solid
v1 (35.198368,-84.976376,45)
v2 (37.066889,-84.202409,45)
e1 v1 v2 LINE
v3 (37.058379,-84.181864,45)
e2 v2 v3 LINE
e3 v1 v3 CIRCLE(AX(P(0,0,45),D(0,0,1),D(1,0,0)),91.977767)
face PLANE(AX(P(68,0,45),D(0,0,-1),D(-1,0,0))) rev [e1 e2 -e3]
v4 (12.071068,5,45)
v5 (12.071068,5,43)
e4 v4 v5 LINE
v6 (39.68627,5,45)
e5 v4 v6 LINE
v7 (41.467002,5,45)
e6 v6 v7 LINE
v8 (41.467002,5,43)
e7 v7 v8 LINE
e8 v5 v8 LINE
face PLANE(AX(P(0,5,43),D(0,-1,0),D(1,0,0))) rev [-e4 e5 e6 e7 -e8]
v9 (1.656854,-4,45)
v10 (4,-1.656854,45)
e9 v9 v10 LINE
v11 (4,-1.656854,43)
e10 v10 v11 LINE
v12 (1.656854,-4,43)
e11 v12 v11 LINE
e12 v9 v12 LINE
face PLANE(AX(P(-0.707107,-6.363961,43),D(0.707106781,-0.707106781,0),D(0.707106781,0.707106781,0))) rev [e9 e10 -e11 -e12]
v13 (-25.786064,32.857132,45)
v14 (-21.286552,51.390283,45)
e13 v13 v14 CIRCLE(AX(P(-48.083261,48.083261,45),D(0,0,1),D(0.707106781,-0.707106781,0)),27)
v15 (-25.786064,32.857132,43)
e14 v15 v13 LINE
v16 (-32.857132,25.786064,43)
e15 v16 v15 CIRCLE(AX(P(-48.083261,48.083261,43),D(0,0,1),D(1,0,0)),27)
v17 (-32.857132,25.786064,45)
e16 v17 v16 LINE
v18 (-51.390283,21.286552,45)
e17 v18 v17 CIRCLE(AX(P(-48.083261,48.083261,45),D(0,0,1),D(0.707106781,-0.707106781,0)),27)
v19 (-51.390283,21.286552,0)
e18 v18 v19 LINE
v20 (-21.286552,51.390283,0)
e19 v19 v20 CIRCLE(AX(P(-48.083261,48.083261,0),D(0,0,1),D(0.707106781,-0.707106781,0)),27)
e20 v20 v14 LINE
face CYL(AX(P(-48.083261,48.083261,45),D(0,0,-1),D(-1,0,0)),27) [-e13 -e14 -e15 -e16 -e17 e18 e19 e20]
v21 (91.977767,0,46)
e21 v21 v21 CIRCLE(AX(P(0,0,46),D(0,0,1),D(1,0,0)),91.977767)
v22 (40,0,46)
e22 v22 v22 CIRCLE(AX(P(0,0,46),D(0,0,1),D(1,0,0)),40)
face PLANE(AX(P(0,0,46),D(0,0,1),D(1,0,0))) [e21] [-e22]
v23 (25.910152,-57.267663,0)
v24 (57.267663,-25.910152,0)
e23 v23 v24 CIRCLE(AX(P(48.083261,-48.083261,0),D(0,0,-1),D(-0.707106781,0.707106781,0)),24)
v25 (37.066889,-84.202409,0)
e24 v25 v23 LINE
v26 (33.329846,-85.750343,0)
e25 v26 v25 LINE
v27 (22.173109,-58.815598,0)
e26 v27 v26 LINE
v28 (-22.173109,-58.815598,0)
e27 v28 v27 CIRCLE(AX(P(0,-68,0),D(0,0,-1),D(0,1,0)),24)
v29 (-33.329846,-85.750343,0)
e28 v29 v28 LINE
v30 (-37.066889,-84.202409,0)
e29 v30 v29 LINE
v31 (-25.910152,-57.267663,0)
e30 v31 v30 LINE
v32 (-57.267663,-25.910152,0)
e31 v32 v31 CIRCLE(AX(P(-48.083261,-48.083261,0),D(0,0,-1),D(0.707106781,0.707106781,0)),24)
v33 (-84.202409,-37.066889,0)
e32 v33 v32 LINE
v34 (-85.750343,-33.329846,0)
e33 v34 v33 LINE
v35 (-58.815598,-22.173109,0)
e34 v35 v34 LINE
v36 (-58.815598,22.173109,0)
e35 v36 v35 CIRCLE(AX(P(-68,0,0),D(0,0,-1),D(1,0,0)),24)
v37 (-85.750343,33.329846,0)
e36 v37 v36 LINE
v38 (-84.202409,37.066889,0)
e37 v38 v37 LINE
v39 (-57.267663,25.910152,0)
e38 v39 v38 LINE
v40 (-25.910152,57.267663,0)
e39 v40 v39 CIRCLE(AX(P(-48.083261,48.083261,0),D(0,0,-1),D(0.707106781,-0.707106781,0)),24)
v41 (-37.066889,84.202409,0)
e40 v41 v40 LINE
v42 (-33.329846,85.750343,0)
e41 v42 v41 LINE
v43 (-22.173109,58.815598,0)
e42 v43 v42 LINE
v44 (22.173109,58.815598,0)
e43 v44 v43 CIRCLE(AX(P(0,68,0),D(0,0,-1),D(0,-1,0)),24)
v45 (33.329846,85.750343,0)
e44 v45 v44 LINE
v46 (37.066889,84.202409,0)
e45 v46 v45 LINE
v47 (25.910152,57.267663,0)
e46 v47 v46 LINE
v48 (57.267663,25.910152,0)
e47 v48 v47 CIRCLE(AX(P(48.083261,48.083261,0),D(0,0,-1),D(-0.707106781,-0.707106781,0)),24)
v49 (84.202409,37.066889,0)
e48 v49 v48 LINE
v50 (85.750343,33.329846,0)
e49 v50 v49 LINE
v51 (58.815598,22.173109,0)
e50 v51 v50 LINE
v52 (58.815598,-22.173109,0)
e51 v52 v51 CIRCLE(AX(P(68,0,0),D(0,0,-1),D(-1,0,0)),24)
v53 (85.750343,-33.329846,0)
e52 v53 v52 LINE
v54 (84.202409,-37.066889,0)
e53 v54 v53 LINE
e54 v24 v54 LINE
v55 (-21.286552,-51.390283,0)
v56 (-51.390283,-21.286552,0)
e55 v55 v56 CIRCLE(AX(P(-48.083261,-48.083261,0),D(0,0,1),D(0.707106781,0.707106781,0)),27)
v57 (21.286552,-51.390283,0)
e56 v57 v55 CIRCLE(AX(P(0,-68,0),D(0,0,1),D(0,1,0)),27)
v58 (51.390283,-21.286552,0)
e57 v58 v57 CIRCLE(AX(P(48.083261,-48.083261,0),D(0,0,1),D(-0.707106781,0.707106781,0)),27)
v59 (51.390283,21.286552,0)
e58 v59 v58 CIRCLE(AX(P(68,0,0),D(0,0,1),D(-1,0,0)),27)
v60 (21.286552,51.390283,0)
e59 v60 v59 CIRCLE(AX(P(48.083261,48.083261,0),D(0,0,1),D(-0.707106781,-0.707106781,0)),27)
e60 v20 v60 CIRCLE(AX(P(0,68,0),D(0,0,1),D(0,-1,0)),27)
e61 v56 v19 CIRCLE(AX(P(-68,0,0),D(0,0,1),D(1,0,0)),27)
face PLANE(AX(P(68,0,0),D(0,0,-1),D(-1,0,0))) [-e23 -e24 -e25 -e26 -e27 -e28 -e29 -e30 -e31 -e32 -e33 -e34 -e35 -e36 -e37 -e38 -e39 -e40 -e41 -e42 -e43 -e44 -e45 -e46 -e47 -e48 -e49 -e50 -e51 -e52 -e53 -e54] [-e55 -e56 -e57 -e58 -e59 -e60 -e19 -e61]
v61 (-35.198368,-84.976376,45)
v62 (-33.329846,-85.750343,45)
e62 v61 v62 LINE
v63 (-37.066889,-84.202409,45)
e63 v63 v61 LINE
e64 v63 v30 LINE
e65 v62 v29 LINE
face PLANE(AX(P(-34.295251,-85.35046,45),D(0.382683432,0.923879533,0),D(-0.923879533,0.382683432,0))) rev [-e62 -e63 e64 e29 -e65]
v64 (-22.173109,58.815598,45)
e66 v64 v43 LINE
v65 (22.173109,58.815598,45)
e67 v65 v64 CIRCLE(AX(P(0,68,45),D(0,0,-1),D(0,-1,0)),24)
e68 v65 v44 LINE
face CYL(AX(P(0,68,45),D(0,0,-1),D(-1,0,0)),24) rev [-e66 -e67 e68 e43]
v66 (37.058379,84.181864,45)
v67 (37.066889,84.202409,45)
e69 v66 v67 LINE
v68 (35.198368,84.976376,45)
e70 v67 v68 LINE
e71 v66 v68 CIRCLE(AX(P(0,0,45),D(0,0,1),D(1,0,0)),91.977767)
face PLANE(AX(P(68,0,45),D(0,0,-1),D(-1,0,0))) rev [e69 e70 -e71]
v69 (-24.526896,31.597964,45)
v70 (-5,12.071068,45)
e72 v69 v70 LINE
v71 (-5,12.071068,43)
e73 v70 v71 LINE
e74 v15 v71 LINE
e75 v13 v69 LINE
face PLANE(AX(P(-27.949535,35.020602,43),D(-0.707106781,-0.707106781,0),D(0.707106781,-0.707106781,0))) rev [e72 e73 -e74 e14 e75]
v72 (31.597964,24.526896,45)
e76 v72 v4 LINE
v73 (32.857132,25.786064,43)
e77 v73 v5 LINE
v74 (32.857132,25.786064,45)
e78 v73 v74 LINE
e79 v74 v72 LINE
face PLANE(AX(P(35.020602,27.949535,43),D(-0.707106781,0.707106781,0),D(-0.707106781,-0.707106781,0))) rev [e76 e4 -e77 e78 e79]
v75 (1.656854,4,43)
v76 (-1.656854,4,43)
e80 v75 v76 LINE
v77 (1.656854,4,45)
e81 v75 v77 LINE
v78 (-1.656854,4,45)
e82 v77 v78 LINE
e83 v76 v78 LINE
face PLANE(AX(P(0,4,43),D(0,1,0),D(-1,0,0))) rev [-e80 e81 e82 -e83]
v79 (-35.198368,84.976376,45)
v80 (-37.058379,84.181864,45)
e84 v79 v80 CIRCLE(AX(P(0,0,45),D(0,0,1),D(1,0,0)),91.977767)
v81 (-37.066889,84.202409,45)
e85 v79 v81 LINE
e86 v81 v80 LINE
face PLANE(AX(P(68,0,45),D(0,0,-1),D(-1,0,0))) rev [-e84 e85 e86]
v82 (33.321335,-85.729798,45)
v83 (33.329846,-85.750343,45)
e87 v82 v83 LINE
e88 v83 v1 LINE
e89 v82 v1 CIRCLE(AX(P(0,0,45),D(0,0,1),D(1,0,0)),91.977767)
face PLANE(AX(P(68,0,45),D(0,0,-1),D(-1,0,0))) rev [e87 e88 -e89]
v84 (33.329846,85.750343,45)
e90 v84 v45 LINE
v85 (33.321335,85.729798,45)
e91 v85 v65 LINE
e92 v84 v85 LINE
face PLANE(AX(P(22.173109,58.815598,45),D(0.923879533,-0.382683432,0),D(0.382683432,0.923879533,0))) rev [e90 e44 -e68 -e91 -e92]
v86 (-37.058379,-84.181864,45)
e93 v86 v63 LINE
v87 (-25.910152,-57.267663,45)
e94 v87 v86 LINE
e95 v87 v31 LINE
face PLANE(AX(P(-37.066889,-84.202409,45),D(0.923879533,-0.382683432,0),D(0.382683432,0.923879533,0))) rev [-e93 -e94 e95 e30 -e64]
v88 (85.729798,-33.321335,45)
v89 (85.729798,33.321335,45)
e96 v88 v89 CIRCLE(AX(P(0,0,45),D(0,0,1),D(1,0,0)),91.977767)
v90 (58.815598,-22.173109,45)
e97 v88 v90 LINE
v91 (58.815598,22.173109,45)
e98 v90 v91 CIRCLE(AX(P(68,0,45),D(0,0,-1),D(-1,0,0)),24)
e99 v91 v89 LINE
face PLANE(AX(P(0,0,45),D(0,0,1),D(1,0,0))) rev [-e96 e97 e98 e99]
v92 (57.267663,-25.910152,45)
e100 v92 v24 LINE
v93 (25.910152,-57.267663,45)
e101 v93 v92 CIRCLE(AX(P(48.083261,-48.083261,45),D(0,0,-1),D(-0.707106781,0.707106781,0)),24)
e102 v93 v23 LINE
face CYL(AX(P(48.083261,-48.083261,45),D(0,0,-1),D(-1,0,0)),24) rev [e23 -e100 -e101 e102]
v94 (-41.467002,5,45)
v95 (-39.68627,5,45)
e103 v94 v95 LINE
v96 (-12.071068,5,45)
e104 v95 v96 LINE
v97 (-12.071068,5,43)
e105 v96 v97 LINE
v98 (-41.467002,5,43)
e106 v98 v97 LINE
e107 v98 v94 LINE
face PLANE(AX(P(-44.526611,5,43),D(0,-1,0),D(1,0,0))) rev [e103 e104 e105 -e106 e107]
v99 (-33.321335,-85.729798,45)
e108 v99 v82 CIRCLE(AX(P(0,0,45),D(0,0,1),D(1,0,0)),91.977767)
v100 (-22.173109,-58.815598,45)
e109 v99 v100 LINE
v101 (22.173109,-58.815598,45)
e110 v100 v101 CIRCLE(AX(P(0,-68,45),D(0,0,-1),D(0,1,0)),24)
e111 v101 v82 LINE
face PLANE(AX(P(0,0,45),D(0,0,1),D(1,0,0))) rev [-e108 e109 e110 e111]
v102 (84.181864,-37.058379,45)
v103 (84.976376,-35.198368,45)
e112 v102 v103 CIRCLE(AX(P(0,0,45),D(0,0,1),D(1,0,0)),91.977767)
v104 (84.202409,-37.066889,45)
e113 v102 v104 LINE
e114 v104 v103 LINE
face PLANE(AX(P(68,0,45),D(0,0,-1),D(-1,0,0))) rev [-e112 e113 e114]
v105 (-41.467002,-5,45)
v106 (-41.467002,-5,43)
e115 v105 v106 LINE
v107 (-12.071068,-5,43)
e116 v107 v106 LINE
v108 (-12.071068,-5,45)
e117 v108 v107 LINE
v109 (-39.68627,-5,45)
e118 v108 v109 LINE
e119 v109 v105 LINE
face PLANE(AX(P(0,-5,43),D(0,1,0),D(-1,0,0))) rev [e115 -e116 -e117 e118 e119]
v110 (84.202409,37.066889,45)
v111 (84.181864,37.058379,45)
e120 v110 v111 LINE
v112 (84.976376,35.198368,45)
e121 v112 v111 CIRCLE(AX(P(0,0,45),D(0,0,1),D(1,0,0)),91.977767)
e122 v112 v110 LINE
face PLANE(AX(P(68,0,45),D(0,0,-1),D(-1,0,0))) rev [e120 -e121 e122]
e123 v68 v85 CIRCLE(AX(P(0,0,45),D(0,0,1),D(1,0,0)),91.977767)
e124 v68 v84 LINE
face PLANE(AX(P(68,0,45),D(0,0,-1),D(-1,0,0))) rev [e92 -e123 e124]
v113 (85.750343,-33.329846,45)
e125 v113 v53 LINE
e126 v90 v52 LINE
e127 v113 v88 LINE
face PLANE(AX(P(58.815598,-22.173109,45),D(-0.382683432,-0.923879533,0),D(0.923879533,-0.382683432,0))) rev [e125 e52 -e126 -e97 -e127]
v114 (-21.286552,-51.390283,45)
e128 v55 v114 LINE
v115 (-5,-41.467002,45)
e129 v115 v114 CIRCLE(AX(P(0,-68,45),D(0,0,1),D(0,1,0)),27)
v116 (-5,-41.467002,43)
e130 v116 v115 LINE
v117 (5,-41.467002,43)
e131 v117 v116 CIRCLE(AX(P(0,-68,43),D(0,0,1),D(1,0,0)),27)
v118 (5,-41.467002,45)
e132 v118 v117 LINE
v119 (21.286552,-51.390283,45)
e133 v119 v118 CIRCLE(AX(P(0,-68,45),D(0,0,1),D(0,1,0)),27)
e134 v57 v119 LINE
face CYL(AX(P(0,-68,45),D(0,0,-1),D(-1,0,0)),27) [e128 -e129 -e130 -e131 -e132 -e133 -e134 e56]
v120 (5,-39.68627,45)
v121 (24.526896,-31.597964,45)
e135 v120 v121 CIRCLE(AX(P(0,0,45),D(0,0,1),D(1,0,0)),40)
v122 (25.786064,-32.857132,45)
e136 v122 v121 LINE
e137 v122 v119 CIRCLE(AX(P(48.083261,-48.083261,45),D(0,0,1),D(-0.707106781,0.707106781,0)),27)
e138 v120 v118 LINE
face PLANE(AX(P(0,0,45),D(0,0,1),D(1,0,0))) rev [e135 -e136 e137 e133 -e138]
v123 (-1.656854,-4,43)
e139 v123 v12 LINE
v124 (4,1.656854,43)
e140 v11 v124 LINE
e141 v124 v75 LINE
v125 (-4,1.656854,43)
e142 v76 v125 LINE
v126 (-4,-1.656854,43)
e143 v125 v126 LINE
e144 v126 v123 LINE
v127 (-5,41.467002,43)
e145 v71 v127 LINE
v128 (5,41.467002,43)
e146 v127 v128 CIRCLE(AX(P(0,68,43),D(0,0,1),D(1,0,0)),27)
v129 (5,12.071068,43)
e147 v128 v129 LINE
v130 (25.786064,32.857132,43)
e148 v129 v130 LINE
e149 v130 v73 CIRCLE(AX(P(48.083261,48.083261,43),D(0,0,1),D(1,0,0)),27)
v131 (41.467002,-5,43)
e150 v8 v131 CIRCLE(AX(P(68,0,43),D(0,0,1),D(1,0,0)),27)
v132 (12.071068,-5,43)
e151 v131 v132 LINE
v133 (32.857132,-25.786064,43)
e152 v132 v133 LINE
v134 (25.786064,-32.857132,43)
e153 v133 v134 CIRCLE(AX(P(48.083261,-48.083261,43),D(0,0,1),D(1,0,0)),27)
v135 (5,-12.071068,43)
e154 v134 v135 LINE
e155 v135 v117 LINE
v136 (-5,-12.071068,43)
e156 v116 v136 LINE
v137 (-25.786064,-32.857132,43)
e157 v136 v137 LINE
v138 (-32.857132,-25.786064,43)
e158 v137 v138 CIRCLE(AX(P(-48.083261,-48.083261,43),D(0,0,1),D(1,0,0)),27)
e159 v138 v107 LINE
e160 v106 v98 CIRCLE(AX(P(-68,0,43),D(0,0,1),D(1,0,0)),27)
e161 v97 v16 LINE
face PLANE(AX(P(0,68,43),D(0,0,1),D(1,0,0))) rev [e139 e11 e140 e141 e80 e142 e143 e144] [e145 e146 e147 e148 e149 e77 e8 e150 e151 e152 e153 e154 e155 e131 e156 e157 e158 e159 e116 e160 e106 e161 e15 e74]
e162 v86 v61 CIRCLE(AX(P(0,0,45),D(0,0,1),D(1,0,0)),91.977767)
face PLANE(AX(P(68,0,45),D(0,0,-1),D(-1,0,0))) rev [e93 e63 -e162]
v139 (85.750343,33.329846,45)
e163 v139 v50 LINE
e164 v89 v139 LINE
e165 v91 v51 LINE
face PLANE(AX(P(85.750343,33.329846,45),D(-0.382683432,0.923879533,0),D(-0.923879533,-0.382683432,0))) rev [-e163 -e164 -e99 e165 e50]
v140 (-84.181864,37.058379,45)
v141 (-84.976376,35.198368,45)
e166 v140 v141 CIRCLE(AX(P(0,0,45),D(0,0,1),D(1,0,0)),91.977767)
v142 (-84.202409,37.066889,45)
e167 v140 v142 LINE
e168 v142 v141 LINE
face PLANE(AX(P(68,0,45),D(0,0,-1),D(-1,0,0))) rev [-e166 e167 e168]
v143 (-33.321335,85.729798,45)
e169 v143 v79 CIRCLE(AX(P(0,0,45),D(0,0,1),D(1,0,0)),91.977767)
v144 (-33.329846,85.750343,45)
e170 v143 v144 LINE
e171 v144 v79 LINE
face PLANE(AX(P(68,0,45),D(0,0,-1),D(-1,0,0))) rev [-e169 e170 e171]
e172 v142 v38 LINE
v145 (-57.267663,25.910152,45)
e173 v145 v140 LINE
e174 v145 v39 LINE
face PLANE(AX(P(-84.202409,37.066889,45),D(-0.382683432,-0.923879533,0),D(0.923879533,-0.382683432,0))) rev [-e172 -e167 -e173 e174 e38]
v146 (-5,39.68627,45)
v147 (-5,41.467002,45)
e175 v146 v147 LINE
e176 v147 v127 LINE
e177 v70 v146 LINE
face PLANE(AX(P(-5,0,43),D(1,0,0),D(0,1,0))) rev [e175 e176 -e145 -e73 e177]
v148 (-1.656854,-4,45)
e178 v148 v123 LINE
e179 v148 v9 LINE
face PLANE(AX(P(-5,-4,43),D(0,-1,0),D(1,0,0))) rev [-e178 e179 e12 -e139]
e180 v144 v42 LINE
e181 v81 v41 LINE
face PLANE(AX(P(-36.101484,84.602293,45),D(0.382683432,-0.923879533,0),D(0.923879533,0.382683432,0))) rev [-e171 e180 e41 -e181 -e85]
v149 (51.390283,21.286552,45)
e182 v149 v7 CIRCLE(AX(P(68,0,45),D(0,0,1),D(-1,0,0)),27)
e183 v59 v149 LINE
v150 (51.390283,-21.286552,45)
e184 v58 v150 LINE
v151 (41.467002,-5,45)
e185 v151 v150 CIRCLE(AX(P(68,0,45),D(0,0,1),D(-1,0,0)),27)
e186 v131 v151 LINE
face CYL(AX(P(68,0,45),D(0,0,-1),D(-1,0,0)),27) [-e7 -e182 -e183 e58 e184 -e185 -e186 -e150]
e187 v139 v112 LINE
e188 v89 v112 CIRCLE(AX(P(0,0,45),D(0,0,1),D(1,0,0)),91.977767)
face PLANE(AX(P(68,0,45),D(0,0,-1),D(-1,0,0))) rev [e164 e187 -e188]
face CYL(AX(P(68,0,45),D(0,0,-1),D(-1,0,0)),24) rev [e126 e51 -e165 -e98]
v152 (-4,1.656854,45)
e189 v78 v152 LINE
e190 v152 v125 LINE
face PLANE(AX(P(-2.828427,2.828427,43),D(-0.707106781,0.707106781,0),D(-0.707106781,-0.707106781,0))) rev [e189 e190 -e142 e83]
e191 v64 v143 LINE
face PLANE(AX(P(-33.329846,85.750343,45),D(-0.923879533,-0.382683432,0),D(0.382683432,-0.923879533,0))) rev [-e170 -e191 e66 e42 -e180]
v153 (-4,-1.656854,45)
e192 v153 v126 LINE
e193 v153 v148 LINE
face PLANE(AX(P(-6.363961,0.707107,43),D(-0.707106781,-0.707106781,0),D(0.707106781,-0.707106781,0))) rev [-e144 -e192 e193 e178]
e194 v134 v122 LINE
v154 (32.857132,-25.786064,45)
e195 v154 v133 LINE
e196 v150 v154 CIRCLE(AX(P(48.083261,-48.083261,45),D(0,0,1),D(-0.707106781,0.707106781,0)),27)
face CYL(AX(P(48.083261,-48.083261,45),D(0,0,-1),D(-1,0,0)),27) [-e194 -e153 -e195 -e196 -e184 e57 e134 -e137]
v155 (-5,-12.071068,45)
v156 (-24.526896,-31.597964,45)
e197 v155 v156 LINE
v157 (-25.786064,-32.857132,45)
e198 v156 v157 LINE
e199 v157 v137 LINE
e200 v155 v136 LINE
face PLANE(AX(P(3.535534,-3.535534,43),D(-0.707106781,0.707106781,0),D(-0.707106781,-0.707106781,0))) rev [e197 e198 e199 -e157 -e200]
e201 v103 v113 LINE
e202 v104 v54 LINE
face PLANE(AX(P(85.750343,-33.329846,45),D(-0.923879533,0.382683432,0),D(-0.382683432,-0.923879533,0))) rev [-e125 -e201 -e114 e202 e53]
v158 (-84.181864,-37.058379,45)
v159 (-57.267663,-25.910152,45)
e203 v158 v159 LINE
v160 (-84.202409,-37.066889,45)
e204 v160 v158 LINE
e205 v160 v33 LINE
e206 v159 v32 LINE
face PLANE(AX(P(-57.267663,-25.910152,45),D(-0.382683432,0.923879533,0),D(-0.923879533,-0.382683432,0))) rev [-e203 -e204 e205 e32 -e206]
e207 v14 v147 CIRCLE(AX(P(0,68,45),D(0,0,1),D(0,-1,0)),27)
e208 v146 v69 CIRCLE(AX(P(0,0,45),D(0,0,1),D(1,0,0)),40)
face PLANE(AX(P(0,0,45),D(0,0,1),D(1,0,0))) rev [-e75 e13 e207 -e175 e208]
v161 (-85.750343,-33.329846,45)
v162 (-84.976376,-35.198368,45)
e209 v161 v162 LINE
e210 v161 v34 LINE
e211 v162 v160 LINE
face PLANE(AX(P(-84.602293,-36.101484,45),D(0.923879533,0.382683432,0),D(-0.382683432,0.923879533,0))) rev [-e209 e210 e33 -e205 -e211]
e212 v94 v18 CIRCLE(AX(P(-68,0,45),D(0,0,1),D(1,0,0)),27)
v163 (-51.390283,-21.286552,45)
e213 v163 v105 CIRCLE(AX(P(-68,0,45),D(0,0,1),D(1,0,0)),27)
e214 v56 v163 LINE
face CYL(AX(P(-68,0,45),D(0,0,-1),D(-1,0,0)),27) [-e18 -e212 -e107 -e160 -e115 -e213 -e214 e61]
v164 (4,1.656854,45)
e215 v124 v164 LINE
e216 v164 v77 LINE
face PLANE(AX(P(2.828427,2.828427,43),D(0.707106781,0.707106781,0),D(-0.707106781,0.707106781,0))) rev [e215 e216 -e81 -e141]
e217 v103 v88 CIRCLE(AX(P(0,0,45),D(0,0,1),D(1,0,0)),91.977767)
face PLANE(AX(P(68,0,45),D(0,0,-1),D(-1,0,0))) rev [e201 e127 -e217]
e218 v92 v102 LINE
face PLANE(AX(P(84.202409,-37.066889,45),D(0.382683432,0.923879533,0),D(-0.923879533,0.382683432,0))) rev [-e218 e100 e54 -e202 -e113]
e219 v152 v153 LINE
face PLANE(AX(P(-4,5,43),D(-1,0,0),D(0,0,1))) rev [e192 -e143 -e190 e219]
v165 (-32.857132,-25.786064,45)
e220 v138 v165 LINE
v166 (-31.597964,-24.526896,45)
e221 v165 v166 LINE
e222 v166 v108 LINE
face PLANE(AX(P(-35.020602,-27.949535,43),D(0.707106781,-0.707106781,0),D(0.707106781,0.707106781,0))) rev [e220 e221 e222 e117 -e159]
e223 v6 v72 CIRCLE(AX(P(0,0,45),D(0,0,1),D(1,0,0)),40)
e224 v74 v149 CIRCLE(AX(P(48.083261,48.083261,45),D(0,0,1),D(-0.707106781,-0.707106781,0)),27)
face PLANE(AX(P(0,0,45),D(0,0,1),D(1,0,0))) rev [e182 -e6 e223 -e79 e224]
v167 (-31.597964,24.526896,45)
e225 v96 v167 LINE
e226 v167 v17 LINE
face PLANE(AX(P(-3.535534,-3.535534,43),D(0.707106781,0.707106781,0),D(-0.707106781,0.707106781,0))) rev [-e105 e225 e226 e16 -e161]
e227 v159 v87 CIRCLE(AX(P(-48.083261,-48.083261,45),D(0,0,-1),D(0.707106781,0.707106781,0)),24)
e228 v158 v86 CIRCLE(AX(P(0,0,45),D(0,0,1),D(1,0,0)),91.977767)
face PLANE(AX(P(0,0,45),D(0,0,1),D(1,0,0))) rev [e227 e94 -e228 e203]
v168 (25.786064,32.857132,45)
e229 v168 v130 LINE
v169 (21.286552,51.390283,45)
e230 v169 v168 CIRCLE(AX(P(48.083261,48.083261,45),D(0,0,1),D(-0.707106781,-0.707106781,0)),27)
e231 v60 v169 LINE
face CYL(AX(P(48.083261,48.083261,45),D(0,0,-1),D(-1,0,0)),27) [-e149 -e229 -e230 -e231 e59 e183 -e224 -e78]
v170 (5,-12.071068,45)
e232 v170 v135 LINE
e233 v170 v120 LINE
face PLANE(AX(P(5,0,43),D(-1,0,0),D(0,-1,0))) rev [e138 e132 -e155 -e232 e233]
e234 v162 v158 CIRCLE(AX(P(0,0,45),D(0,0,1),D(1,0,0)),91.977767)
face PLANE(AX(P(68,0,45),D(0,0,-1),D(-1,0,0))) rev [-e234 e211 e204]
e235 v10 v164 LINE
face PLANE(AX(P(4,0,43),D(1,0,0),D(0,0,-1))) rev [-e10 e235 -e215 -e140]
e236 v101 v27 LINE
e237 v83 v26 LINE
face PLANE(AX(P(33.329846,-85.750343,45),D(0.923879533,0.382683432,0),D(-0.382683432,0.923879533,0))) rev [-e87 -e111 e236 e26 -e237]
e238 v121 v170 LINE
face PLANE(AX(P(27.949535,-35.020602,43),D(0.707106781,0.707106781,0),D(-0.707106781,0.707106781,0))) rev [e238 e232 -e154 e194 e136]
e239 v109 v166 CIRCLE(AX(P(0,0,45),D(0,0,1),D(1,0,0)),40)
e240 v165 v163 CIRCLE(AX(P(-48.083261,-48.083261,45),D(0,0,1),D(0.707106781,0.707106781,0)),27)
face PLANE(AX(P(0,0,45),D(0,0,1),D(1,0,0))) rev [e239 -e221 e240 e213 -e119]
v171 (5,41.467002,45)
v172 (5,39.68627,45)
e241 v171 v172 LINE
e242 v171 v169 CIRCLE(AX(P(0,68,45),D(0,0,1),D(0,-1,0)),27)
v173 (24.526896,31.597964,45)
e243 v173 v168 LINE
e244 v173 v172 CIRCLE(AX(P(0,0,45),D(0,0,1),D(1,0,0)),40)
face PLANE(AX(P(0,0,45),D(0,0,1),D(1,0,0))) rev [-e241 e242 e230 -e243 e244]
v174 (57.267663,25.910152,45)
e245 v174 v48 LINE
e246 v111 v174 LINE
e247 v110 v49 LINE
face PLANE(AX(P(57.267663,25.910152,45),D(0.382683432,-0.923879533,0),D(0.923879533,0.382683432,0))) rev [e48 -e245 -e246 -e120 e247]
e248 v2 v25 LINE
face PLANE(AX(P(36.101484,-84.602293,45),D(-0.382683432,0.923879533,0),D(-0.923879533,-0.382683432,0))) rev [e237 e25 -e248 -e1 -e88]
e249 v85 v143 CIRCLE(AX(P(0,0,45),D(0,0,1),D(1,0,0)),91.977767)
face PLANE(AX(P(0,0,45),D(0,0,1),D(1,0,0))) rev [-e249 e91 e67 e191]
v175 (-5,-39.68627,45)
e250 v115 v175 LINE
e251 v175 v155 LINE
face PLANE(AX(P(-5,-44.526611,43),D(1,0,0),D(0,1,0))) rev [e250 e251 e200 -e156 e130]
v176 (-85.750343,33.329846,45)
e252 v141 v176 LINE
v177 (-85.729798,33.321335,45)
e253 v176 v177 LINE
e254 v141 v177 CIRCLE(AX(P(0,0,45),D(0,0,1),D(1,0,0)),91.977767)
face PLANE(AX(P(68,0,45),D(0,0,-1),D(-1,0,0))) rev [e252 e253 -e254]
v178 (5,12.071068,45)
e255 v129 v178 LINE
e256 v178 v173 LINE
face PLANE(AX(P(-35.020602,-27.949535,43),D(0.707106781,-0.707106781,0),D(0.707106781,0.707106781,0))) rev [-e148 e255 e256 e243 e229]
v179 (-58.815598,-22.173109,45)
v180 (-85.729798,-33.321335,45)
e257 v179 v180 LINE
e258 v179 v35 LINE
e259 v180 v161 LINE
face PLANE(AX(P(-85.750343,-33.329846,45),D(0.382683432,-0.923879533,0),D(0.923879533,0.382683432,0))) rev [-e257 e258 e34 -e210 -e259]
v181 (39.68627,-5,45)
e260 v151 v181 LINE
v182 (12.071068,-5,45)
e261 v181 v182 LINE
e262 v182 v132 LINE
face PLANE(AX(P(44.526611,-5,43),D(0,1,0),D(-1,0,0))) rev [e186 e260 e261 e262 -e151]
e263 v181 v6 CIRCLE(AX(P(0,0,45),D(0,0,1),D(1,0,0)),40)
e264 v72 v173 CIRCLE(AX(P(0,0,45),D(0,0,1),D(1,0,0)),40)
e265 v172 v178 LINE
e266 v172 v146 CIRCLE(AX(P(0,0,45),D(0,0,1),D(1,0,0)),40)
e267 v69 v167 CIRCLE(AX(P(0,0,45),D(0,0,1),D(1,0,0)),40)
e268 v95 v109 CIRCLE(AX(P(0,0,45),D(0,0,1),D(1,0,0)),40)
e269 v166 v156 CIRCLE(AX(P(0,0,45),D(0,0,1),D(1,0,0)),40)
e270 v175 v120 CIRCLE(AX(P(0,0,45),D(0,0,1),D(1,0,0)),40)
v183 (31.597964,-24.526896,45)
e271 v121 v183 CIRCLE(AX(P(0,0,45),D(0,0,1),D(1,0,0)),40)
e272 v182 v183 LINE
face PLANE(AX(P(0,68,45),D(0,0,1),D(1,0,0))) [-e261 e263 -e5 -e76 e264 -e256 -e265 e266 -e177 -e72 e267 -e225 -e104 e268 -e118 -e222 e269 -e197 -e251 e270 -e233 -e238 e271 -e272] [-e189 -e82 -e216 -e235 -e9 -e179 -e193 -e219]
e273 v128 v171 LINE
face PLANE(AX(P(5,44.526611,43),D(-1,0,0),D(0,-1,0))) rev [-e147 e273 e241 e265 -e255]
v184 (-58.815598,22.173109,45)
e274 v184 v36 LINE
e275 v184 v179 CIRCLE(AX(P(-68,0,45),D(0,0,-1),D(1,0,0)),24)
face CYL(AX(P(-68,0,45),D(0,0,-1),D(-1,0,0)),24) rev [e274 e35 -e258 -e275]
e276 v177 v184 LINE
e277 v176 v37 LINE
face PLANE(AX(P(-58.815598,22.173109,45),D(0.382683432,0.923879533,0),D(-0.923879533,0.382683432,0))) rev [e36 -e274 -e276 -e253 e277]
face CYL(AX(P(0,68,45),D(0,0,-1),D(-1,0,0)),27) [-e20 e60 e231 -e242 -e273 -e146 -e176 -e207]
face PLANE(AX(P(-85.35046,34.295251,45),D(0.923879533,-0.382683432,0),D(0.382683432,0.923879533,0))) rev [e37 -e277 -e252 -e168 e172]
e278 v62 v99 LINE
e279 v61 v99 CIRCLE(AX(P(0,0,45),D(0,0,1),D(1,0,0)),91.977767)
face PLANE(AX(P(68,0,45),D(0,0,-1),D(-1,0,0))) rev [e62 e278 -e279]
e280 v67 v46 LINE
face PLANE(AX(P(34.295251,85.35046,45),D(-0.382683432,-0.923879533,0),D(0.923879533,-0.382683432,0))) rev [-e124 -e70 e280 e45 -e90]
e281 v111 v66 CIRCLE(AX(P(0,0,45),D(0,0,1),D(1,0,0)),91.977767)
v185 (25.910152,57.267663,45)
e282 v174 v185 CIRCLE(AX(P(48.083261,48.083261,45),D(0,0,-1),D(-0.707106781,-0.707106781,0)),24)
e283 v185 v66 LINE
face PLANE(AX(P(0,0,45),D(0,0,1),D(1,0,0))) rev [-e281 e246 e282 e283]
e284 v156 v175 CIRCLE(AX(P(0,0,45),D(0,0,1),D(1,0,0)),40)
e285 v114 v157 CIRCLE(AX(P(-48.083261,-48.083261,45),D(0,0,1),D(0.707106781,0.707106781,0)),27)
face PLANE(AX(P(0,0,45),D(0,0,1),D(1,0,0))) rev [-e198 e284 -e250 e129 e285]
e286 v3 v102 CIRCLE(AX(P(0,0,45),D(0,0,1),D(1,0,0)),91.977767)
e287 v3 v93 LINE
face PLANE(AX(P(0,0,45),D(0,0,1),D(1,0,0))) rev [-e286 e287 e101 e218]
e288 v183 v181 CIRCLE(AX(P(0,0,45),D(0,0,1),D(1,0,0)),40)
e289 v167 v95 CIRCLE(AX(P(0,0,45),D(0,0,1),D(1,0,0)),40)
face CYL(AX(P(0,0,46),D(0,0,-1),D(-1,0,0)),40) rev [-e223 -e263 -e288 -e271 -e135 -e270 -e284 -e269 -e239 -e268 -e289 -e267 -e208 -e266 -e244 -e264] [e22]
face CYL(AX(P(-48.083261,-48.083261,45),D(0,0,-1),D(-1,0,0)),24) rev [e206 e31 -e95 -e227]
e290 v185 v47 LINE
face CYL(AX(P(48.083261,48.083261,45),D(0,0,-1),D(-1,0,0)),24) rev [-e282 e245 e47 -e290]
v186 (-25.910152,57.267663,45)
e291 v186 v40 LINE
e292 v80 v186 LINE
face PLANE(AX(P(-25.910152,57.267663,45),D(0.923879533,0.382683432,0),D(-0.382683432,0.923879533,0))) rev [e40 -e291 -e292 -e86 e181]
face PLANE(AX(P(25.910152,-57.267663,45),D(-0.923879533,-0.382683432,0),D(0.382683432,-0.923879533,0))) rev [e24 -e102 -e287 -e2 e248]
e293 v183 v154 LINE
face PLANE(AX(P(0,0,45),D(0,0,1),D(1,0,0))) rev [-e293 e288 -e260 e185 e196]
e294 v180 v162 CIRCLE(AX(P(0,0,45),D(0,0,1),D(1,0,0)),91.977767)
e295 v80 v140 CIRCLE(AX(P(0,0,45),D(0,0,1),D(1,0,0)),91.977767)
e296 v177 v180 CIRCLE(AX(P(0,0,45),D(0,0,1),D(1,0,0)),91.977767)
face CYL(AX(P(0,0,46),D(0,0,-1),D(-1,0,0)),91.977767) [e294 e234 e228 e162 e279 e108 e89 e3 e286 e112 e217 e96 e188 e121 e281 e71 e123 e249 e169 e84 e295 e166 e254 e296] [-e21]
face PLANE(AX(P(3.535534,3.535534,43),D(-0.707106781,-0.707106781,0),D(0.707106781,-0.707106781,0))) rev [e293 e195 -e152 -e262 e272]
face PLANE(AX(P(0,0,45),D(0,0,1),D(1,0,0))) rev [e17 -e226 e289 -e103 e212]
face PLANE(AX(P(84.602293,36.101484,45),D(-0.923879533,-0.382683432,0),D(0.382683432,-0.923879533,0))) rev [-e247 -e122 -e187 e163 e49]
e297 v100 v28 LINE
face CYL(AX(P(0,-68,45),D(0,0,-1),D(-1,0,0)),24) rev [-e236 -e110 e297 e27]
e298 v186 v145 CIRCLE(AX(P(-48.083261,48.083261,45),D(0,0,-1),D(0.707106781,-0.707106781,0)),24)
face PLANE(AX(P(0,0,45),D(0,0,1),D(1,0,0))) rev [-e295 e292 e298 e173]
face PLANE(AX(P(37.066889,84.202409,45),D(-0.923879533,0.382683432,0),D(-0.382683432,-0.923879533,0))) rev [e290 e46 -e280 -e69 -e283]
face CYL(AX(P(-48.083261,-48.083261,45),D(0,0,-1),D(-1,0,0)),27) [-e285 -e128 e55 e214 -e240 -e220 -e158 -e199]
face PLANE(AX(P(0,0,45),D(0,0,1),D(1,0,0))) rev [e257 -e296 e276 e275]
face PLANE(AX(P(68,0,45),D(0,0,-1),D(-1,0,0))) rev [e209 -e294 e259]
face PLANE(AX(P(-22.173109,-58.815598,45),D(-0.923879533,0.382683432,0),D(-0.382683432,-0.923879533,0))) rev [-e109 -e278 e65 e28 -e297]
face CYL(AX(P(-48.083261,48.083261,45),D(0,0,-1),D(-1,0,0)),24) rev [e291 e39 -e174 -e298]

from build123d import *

# Parameters (mm, degrees)
MAIN_EXTRUSION_DEPTH         = 45
R_P_TITION_CIRCULAIRE1_DEPTH = 45
ESQUISSE2_R                  = 91.977766886
ESQUISSE2_R_2                = 40
GLOBAL_CIRCLE_DEPTH          = 1
CENTRAL_START                = 2
CENTRAL_FIXING_DEPTH         = 2
R_P_TITION_CIRCULAIRE2_COUNT = 8


# Read off the part's stored shape, not the designer's step: Répétition circulaire1
with BuildPart() as part:
    # Esquisse1 → Main Extrusion (new body)
    with BuildSketch(Plane.XY):
        with BuildLine():
            Line((57.667547326, 24.944747378), (84.602293038, 36.101484351))
            Line((84.602293038, 36.101484351), (85.750343335, 33.329845753))
            Line((85.750343335, 33.329845753), (58.815597623, 22.17310878))
            ThreePointArc((58.815597623, 22.17310878), (44, 0), (58.815597623, -22.17310878))
            Line((58.815597623, -22.17310878), (85.750343335, -33.329845753))
            Line((85.750343335, -33.329845753), (84.602293038, -36.101484351))
            Line((84.602293038, -36.101484351), (57.667547326, -24.944747378))
            ThreePointArc((57.667547326, -24.944747378), (41, 0), (57.667547326, 24.944747378))
        make_face()
    extrude(amount=MAIN_EXTRUSION_DEPTH)

    # Répétition circulaire1 outline → Répétition circulaire1 (add)
    with BuildSketch(Plane.XY):
        with BuildLine():
            Line((-84.202409209, -37.066889313), (-57.267663497, -25.91015234))
            ThreePointArc((-57.267663497, -25.91015234), (-31.112698372, -31.112698372), (-25.91015234, -57.267663497))
            Line((-25.91015234, -57.267663497), (-37.066889313, -84.202409209))
            Line((-37.066889313, -84.202409209), (-33.329845753, -85.750343335))
            Line((-33.329845753, -85.750343335), (-22.17310878, -58.815597623))
            ThreePointArc((-22.17310878, -58.815597623), (0, -44), (22.17310878, -58.815597623))
            Line((22.17310878, -58.815597623), (33.329845753, -85.750343335))
            Line((33.329845753, -85.750343335), (37.066889313, -84.202409209))
            Line((37.066889313, -84.202409209), (25.91015234, -57.267663497))
            ThreePointArc((25.91015234, -57.267663497), (31.112698372, -31.112698372), (57.267663497, -25.91015234))
            Line((57.267663497, -25.91015234), (84.202409209, -37.066889313))
            Line((84.202409209, -37.066889313), (84.602293038, -36.101484351))
            Line((84.602293038, -36.101484351), (57.667547326, -24.944747378))
            ThreePointArc((57.667547326, -24.944747378), (54.405305377, -23.327757675), (51.390283197, -21.286552275))
            ThreePointArc((51.390283197, -21.286552275), (28.991378029, -28.991378029), (21.286552275, -51.390283197))
            ThreePointArc((21.286552275, -51.390283197), (0, -41), (-21.286552275, -51.390283197))
            ThreePointArc((-21.286552275, -51.390283197), (-28.991378029, -28.991378029), (-51.390283197, -21.286552275))
            ThreePointArc((-51.390283197, -21.286552275), (-41, 0), (-51.390283197, 21.286552275))
            ThreePointArc((-51.390283197, 21.286552275), (-28.991378029, 28.991378029), (-21.286552275, 51.390283197))
            ThreePointArc((-21.286552275, 51.390283197), (0, 41), (21.286552275, 51.390283197))
            ThreePointArc((21.286552275, 51.390283197), (28.991378029, 28.991378029), (51.390283197, 21.286552275))
            ThreePointArc((51.390283197, 21.286552275), (54.405305377, 23.327757675), (57.667547326, 24.944747378))
            Line((57.667547326, 24.944747378), (84.602293038, 36.101484351))
            Line((84.602293038, 36.101484351), (84.202409209, 37.066889313))
            Line((84.202409209, 37.066889313), (57.267663497, 25.91015234))
            ThreePointArc((57.267663497, 25.91015234), (31.112698372, 31.112698372), (25.91015234, 57.267663497))
            Line((25.91015234, 57.267663497), (37.066889313, 84.202409209))
            Line((37.066889313, 84.202409209), (33.329845753, 85.750343335))
            Line((33.329845753, 85.750343335), (22.17310878, 58.815597623))
            ThreePointArc((22.17310878, 58.815597623), (0, 44), (-22.17310878, 58.815597623))
            Line((-22.17310878, 58.815597623), (-33.329845753, 85.750343335))
            Line((-33.329845753, 85.750343335), (-37.066889313, 84.202409209))
            Line((-37.066889313, 84.202409209), (-25.91015234, 57.267663497))
            ThreePointArc((-25.91015234, 57.267663497), (-31.112698372, 31.112698372), (-57.267663497, 25.91015234))
            Line((-57.267663497, 25.91015234), (-84.202409209, 37.066889313))
            Line((-84.202409209, 37.066889313), (-85.750343335, 33.329845753))
            Line((-85.750343335, 33.329845753), (-58.815597623, 22.17310878))
            ThreePointArc((-58.815597623, 22.17310878), (-44, 0), (-58.815597623, -22.17310878))
            Line((-58.815597623, -22.17310878), (-85.750343335, -33.329845753))
            Line((-85.750343335, -33.329845753), (-84.202409209, -37.066889313))
        make_face()
    extrude(amount=R_P_TITION_CIRCULAIRE1_DEPTH)

    # Esquisse2 → Global Circle (add)
    with BuildSketch(Plane.XY.offset(45)):
        with Locations(Location((0, 0, 0), (0, 0, 201.240037576))):
            Circle(ESQUISSE2_R)
        Circle(ESQUISSE2_R_2, mode=Mode.SUBTRACT)
    extrude(amount=GLOBAL_CIRCLE_DEPTH)

    # Esquisse3 → Central Fixing (add)
    with BuildSketch(Plane(origin=(0, 0, 45), x_dir=(-1, 0, 0), z_dir=(0, 0, -1)).offset(CENTRAL_START)):
        with BuildLine():
            Line((-5, 44.526610811), (-5, 0))
            Line((-5, 0), (-4, 0))
            Line((-4, 0), (-4, 5))
            Line((-4, 5), (4, 5))
            Line((4, 5), (4, 0))
            Line((4, 0), (5, 0))
            Line((5, 0), (5, 44.526610811))
            ThreePointArc((5, 44.526610811), (0, 44), (-5, 44.526610811))
        make_face()
    central_fixing = extrude(amount=-CENTRAL_FIXING_DEPTH)

    # Répétition circulaire2: Central Fixing ×8 about axis
    r_p_tition_circulaire2_axis = Axis((0, 0, 0), (0, 0, 1))
    for i in range(1, R_P_TITION_CIRCULAIRE2_COUNT):
        add(central_fixing.rotate(r_p_tition_circulaire2_axis, i * 360 / R_P_TITION_CIRCULAIRE2_COUNT))


solid = part.part
